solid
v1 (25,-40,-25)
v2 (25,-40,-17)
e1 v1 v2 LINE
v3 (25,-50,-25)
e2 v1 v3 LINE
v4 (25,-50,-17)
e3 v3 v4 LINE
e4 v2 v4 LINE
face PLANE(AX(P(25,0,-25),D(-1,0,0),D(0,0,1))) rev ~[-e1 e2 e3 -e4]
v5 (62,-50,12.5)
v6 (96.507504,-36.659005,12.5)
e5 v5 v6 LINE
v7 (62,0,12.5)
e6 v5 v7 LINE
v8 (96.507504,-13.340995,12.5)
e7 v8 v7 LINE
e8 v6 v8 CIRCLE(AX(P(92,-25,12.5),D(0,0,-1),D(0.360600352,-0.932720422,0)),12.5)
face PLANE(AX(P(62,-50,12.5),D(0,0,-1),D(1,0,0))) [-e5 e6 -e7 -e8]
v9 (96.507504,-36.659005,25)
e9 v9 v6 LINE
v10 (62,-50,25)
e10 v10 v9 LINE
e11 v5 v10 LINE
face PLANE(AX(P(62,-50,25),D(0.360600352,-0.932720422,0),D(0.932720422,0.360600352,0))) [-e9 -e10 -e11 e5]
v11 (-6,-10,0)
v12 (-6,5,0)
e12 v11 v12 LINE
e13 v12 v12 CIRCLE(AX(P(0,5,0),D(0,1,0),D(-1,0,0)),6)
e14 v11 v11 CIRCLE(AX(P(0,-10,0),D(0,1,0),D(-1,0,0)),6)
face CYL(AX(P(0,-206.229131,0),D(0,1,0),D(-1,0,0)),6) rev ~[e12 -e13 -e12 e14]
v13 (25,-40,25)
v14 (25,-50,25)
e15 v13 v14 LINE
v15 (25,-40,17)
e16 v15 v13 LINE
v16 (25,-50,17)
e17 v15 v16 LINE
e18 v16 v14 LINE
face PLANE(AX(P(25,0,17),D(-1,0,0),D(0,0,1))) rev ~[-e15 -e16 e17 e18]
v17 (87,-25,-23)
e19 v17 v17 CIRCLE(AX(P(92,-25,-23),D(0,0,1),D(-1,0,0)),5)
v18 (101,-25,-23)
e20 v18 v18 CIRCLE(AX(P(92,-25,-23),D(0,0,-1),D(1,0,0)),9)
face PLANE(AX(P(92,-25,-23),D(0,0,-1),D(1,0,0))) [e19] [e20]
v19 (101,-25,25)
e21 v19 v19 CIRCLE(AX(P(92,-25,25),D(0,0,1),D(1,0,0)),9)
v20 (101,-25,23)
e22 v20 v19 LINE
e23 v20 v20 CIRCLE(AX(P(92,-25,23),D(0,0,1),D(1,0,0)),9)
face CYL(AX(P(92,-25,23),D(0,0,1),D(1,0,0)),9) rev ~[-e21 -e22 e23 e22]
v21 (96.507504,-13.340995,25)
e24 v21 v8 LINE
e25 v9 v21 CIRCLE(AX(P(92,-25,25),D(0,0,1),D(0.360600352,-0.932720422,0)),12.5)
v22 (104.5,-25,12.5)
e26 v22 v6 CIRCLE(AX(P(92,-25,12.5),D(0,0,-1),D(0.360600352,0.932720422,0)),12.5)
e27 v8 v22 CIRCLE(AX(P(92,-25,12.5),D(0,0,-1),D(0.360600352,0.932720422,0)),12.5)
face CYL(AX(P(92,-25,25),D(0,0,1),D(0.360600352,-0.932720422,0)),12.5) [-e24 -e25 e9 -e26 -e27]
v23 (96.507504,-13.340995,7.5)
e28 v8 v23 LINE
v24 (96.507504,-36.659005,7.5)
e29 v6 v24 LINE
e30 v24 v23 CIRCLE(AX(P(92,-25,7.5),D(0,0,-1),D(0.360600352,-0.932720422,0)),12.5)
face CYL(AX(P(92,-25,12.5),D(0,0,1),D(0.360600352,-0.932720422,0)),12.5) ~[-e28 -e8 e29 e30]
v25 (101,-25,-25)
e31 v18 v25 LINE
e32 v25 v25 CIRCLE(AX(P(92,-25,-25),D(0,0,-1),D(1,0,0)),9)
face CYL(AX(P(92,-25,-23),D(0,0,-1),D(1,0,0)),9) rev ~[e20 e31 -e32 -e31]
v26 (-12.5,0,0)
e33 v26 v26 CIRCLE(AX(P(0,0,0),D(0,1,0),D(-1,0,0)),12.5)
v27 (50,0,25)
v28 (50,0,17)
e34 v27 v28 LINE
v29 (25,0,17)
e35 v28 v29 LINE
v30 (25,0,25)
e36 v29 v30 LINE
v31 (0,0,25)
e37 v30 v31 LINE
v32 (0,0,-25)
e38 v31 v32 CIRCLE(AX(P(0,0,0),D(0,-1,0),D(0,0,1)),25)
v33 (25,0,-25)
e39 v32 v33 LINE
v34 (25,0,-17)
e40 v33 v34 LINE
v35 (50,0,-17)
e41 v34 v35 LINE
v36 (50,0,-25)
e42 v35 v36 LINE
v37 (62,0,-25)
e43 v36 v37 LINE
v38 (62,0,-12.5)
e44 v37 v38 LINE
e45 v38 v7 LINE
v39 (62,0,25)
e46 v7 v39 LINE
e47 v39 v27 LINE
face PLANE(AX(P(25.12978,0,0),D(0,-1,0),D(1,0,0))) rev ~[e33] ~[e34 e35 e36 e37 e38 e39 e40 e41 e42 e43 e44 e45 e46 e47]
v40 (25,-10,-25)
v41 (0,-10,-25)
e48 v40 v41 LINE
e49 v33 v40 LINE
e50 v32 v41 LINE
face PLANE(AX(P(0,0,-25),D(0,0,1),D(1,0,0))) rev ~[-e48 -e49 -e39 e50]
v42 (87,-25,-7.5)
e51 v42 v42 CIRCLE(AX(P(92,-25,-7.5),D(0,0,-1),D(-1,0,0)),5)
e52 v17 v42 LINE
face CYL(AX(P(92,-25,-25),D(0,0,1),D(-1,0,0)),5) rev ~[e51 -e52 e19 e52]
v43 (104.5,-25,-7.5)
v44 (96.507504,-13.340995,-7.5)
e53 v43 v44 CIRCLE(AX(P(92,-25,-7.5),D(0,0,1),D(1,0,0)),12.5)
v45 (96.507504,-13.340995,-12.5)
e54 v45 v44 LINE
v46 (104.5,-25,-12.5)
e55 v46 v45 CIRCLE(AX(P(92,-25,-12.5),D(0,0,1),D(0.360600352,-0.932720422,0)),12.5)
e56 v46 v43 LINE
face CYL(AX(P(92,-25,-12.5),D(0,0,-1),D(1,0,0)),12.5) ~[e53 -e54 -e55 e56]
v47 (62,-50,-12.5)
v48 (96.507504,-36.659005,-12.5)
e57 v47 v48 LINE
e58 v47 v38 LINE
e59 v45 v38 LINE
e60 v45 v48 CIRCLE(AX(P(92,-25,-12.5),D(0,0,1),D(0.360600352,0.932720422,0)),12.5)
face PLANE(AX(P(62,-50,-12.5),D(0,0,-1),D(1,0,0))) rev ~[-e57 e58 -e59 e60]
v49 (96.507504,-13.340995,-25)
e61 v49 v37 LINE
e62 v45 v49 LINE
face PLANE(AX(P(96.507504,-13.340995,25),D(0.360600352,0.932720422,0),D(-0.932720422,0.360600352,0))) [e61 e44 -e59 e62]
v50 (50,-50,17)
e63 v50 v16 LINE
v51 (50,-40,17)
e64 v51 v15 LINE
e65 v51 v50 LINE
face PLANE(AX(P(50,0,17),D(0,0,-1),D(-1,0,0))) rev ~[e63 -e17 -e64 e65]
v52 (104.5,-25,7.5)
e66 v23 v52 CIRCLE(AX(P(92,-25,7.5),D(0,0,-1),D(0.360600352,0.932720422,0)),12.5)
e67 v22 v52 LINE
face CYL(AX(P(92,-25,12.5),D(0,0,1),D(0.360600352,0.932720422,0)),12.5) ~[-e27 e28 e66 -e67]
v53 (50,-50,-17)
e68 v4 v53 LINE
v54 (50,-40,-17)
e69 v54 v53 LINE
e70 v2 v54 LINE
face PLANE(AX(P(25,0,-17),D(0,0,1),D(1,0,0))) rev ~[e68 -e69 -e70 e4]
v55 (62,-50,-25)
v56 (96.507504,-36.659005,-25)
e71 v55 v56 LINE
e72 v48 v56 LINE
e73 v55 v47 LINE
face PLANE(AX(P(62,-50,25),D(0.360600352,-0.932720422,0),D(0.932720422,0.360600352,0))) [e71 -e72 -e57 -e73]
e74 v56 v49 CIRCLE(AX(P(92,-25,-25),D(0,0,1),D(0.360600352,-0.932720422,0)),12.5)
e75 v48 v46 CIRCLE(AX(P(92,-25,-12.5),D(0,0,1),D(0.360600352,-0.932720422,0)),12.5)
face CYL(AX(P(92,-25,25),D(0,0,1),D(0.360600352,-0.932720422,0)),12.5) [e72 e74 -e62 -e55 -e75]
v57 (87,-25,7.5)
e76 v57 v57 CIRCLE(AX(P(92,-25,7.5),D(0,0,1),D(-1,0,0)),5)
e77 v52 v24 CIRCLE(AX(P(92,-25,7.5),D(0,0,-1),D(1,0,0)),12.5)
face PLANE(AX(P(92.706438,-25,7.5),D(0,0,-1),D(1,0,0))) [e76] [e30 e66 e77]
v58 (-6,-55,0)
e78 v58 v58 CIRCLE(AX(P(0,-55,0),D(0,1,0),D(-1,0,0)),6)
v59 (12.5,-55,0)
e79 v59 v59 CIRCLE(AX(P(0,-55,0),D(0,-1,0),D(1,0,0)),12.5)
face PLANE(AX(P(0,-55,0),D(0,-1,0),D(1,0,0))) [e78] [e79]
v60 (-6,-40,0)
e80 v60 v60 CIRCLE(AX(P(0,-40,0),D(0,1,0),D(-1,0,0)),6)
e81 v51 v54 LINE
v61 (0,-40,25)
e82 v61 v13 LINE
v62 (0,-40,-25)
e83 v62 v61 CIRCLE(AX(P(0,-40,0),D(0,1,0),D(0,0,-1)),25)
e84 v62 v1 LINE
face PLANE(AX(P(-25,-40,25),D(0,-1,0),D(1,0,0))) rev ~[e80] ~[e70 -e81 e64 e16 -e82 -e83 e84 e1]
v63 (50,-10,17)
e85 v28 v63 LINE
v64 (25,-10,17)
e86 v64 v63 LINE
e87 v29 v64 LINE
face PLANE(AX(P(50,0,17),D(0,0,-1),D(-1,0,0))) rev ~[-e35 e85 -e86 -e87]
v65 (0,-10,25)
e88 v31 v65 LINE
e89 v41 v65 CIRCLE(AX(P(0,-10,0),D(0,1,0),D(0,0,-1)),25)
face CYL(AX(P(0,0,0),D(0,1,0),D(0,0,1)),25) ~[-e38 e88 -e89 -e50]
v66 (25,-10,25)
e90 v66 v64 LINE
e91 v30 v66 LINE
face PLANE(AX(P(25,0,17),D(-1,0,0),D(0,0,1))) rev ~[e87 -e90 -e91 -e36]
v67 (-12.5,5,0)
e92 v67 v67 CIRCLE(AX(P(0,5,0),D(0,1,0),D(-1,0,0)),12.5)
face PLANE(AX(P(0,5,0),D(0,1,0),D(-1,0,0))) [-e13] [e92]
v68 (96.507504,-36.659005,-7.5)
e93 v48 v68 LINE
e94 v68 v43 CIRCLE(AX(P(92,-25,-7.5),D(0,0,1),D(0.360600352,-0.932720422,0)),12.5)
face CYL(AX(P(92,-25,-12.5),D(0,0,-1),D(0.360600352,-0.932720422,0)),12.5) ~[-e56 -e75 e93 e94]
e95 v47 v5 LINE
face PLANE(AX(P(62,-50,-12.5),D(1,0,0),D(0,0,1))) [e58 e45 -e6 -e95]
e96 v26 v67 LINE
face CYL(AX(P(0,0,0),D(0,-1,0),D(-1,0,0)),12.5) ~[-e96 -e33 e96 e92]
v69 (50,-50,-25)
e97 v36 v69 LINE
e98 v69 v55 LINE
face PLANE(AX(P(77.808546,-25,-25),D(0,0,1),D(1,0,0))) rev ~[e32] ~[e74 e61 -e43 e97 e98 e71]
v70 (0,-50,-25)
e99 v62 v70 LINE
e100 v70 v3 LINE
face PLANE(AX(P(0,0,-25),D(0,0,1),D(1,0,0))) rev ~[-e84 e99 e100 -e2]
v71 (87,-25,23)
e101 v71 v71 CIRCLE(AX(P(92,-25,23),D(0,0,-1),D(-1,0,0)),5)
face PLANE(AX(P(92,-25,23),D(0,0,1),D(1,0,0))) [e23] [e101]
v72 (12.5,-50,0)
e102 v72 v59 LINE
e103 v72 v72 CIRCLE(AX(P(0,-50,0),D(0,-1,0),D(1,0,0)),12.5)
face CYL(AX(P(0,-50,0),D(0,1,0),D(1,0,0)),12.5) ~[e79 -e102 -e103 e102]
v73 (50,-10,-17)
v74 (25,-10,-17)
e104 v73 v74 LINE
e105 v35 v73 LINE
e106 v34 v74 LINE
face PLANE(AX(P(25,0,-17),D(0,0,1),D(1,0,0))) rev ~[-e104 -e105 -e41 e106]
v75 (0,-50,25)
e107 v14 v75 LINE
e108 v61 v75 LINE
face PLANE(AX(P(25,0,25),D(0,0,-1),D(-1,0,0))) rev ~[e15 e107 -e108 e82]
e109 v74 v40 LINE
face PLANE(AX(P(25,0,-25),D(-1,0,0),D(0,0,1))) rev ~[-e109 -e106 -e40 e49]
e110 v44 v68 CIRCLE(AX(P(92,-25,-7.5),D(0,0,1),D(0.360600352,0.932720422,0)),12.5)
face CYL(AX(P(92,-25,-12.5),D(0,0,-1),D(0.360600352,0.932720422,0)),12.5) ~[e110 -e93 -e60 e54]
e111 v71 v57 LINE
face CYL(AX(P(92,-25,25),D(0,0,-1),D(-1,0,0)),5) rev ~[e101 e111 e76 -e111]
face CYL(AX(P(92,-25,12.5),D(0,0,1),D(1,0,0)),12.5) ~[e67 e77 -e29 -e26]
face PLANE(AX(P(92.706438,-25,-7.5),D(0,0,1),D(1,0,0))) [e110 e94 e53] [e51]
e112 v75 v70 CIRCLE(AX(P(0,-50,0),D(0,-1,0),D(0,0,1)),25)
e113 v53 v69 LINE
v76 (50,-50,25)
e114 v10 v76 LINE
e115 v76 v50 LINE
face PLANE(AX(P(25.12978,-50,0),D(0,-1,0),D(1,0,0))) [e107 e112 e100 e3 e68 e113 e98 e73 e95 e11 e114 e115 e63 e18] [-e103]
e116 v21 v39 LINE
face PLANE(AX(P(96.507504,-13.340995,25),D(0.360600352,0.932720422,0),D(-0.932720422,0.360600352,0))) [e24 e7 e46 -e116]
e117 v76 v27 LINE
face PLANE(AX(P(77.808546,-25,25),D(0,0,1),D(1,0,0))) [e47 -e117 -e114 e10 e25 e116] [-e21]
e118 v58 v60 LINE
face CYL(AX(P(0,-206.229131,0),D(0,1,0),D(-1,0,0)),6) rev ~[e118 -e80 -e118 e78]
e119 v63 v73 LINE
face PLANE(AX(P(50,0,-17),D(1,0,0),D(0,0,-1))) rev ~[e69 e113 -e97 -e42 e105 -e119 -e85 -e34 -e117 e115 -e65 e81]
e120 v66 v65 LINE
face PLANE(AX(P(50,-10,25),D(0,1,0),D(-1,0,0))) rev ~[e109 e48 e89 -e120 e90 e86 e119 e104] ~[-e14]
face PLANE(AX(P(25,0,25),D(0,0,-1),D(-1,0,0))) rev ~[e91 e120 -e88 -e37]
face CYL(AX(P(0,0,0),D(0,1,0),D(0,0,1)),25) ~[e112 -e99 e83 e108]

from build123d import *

# Parameters (mm, degrees)
F1_DEPTH        = 50
F2_W            = 25
F2_H            = 30
F3_DEPTH        = 50.001
F5_DEPTH        = 50
F6_W            = 42.5
F6_H            = 25
F7_DEPTH        = 50.001
F8_R            = 12.5
F9_DEPTH        = 5
F10_R           = 12.5
F11_DEPTH       = 5
F12_R           = 6
F13_DEPTH       = 201
F15_D           = 12
F17_DEPTH       = 5
F19_DEPTH       = 5
F21_D           = 10
F21_DEPTH       = 17.5
F21_CBORE_D     = 18
F21_CBORE_DEPTH = 2
F21_TIP         = 3.0043030951
F23_D           = 10
F23_DEPTH       = 17.5
F23_CBORE_D     = 18
F23_CBORE_DEPTH = 2
F23_TIP         = 3.0043030951


# Not quite as in the source:
# - an extrude ends at something that could not be found from the text; its depth is read off the source's solid


with BuildPart() as f1:
    # F0 (on Front) → F1 (new body)
    with BuildSketch(Plane.XZ):
        with BuildLine():
            Line((25, 25), (0, 25))
            ThreePointArc((0, 25), (-25, 0), (0, -25))
            Line((0, -25), (25, -25))
            Line((25, -25), (25, -17))
            Line((25, -17), (50, -17))
            Line((50, -17), (50, -25))
            Line((50, -25), (62, -25))
            Line((62, -25), (62, 0))
            Line((62, 0), (62, 25))
            Line((62, 25), (50, 25))
            Line((50, 25), (50, 17))
            Line((50, 17), (25, 17))
            Line((25, 17), (25, 25))
        make_face()
    extrude(amount=F1_DEPTH)

    # F2 (on face) → F3 (cut, through all)
    with BuildSketch(Plane.XY.offset(25)):
        with Locations((-12.5, -25)):
            Rectangle(F2_W, F2_H)
        with Locations((12.5, -25)):
            Rectangle(F2_W, F2_H)
        with Locations((37.5, -25)):
            Rectangle(F2_W, F2_H)
    extrude(amount=-F3_DEPTH, mode=Mode.SUBTRACT)

    # F4 (on face) → F5 (join)
    with BuildSketch(Plane.XY.offset(25)):
        with BuildLine():
            Line((62, -50), (96.5075043991, -36.6590052789))
            ThreePointArc((96.5075043991, -36.6590052789), (104.5, -25), (96.5075043991, -13.3409947211))
            Line((96.5075043991, -13.3409947211), (62, 0))
            Line((62, 0), (62, -50))
        make_face()
    extrude(amount=-F5_DEPTH)

    # F6 (on face) → F7 (cut, through all)
    with BuildSketch(Plane.XZ.offset(50)):
        with Locations((83.25, 0)):
            Rectangle(F6_W, F6_H)
    extrude(amount=-F7_DEPTH, mode=Mode.SUBTRACT)

    # F8 (on face) → F9 (join)
    with BuildSketch(Plane.XZ.offset(50)):
        Circle(F8_R)
    extrude(amount=F9_DEPTH)

    # F10 (on face) → F11 (join)
    with BuildSketch(Plane(origin=(0, 0, 0), x_dir=(-1, 0, 0), z_dir=(0, 1, 0))):
        Circle(F10_R)
    extrude(amount=F11_DEPTH)

    # F12 (on face) → F13 (cut, through all)
    with BuildSketch(Plane(origin=(0, 5, 0), x_dir=(-1, 0, 0), z_dir=(0, 1, 0))):
        Circle(F12_R)
    extrude(amount=F13_DEPTH, mode=Mode.SUBTRACT)

    # F15 (through all)
    with Locations(Plane.XZ.offset(55)):
        with Locations((0, 0)):
            Hole(F15_D / 2)

    # F16 (on face) → F17 (join)
    with BuildSketch(Plane.XY.offset(-12.5)):
        with BuildLine():
            ThreePointArc((96.5075043991, -36.6590052789), (102.3100389182, -32.0677505266), (104.5, -25))
            ThreePointArc((104.5, -25), (102.3100389182, -17.9322494734), (96.5075043991, -13.3409947211))
            ThreePointArc((96.5075043991, -13.3409947211), (79.5, -25), (96.5075043991, -36.6590052789))
        make_face()
    extrude(amount=F17_DEPTH)

    # F18 (on face) → F19 (join)
    with BuildSketch(Plane(origin=(0, 0, 12.5), x_dir=(1, 0, 0), z_dir=(0, 0, -1))):
        with BuildLine():
            ThreePointArc((96.5075043991, 13.3409947211), (102.3100389182, 17.9322494734), (104.5, 25))
            ThreePointArc((104.5, 25), (102.3100389182, 32.0677505266), (96.5075043991, 36.6590052789))
            ThreePointArc((96.5075043991, 36.6590052789), (79.5, 25), (96.5075043991, 13.3409947211))
        make_face()
    extrude(amount=F19_DEPTH)

    # F21
    with Locations(Plane.XY.offset(25)):
        with Locations((92, -25)):
            CounterBoreHole(F21_D / 2, F21_CBORE_D / 2, F21_CBORE_DEPTH, depth=F21_DEPTH)
            with Locations((0, 0, -(F21_DEPTH + F21_TIP / 2))):  # 118° drill point
                Cone(0, F21_D / 2, F21_TIP, mode=Mode.SUBTRACT)

    # F23
    with Locations(Plane(origin=(0, 0, -25), x_dir=(1, 0, 0), z_dir=(0, 0, -1))):
        with Locations((92, 25)):
            CounterBoreHole(F23_D / 2, F23_CBORE_D / 2, F23_CBORE_DEPTH, depth=F23_DEPTH)
            with Locations((0, 0, -(F23_DEPTH + F23_TIP / 2))):  # 118° drill point
                Cone(0, F23_D / 2, F23_TIP, mode=Mode.SUBTRACT)


solid = f1.part
